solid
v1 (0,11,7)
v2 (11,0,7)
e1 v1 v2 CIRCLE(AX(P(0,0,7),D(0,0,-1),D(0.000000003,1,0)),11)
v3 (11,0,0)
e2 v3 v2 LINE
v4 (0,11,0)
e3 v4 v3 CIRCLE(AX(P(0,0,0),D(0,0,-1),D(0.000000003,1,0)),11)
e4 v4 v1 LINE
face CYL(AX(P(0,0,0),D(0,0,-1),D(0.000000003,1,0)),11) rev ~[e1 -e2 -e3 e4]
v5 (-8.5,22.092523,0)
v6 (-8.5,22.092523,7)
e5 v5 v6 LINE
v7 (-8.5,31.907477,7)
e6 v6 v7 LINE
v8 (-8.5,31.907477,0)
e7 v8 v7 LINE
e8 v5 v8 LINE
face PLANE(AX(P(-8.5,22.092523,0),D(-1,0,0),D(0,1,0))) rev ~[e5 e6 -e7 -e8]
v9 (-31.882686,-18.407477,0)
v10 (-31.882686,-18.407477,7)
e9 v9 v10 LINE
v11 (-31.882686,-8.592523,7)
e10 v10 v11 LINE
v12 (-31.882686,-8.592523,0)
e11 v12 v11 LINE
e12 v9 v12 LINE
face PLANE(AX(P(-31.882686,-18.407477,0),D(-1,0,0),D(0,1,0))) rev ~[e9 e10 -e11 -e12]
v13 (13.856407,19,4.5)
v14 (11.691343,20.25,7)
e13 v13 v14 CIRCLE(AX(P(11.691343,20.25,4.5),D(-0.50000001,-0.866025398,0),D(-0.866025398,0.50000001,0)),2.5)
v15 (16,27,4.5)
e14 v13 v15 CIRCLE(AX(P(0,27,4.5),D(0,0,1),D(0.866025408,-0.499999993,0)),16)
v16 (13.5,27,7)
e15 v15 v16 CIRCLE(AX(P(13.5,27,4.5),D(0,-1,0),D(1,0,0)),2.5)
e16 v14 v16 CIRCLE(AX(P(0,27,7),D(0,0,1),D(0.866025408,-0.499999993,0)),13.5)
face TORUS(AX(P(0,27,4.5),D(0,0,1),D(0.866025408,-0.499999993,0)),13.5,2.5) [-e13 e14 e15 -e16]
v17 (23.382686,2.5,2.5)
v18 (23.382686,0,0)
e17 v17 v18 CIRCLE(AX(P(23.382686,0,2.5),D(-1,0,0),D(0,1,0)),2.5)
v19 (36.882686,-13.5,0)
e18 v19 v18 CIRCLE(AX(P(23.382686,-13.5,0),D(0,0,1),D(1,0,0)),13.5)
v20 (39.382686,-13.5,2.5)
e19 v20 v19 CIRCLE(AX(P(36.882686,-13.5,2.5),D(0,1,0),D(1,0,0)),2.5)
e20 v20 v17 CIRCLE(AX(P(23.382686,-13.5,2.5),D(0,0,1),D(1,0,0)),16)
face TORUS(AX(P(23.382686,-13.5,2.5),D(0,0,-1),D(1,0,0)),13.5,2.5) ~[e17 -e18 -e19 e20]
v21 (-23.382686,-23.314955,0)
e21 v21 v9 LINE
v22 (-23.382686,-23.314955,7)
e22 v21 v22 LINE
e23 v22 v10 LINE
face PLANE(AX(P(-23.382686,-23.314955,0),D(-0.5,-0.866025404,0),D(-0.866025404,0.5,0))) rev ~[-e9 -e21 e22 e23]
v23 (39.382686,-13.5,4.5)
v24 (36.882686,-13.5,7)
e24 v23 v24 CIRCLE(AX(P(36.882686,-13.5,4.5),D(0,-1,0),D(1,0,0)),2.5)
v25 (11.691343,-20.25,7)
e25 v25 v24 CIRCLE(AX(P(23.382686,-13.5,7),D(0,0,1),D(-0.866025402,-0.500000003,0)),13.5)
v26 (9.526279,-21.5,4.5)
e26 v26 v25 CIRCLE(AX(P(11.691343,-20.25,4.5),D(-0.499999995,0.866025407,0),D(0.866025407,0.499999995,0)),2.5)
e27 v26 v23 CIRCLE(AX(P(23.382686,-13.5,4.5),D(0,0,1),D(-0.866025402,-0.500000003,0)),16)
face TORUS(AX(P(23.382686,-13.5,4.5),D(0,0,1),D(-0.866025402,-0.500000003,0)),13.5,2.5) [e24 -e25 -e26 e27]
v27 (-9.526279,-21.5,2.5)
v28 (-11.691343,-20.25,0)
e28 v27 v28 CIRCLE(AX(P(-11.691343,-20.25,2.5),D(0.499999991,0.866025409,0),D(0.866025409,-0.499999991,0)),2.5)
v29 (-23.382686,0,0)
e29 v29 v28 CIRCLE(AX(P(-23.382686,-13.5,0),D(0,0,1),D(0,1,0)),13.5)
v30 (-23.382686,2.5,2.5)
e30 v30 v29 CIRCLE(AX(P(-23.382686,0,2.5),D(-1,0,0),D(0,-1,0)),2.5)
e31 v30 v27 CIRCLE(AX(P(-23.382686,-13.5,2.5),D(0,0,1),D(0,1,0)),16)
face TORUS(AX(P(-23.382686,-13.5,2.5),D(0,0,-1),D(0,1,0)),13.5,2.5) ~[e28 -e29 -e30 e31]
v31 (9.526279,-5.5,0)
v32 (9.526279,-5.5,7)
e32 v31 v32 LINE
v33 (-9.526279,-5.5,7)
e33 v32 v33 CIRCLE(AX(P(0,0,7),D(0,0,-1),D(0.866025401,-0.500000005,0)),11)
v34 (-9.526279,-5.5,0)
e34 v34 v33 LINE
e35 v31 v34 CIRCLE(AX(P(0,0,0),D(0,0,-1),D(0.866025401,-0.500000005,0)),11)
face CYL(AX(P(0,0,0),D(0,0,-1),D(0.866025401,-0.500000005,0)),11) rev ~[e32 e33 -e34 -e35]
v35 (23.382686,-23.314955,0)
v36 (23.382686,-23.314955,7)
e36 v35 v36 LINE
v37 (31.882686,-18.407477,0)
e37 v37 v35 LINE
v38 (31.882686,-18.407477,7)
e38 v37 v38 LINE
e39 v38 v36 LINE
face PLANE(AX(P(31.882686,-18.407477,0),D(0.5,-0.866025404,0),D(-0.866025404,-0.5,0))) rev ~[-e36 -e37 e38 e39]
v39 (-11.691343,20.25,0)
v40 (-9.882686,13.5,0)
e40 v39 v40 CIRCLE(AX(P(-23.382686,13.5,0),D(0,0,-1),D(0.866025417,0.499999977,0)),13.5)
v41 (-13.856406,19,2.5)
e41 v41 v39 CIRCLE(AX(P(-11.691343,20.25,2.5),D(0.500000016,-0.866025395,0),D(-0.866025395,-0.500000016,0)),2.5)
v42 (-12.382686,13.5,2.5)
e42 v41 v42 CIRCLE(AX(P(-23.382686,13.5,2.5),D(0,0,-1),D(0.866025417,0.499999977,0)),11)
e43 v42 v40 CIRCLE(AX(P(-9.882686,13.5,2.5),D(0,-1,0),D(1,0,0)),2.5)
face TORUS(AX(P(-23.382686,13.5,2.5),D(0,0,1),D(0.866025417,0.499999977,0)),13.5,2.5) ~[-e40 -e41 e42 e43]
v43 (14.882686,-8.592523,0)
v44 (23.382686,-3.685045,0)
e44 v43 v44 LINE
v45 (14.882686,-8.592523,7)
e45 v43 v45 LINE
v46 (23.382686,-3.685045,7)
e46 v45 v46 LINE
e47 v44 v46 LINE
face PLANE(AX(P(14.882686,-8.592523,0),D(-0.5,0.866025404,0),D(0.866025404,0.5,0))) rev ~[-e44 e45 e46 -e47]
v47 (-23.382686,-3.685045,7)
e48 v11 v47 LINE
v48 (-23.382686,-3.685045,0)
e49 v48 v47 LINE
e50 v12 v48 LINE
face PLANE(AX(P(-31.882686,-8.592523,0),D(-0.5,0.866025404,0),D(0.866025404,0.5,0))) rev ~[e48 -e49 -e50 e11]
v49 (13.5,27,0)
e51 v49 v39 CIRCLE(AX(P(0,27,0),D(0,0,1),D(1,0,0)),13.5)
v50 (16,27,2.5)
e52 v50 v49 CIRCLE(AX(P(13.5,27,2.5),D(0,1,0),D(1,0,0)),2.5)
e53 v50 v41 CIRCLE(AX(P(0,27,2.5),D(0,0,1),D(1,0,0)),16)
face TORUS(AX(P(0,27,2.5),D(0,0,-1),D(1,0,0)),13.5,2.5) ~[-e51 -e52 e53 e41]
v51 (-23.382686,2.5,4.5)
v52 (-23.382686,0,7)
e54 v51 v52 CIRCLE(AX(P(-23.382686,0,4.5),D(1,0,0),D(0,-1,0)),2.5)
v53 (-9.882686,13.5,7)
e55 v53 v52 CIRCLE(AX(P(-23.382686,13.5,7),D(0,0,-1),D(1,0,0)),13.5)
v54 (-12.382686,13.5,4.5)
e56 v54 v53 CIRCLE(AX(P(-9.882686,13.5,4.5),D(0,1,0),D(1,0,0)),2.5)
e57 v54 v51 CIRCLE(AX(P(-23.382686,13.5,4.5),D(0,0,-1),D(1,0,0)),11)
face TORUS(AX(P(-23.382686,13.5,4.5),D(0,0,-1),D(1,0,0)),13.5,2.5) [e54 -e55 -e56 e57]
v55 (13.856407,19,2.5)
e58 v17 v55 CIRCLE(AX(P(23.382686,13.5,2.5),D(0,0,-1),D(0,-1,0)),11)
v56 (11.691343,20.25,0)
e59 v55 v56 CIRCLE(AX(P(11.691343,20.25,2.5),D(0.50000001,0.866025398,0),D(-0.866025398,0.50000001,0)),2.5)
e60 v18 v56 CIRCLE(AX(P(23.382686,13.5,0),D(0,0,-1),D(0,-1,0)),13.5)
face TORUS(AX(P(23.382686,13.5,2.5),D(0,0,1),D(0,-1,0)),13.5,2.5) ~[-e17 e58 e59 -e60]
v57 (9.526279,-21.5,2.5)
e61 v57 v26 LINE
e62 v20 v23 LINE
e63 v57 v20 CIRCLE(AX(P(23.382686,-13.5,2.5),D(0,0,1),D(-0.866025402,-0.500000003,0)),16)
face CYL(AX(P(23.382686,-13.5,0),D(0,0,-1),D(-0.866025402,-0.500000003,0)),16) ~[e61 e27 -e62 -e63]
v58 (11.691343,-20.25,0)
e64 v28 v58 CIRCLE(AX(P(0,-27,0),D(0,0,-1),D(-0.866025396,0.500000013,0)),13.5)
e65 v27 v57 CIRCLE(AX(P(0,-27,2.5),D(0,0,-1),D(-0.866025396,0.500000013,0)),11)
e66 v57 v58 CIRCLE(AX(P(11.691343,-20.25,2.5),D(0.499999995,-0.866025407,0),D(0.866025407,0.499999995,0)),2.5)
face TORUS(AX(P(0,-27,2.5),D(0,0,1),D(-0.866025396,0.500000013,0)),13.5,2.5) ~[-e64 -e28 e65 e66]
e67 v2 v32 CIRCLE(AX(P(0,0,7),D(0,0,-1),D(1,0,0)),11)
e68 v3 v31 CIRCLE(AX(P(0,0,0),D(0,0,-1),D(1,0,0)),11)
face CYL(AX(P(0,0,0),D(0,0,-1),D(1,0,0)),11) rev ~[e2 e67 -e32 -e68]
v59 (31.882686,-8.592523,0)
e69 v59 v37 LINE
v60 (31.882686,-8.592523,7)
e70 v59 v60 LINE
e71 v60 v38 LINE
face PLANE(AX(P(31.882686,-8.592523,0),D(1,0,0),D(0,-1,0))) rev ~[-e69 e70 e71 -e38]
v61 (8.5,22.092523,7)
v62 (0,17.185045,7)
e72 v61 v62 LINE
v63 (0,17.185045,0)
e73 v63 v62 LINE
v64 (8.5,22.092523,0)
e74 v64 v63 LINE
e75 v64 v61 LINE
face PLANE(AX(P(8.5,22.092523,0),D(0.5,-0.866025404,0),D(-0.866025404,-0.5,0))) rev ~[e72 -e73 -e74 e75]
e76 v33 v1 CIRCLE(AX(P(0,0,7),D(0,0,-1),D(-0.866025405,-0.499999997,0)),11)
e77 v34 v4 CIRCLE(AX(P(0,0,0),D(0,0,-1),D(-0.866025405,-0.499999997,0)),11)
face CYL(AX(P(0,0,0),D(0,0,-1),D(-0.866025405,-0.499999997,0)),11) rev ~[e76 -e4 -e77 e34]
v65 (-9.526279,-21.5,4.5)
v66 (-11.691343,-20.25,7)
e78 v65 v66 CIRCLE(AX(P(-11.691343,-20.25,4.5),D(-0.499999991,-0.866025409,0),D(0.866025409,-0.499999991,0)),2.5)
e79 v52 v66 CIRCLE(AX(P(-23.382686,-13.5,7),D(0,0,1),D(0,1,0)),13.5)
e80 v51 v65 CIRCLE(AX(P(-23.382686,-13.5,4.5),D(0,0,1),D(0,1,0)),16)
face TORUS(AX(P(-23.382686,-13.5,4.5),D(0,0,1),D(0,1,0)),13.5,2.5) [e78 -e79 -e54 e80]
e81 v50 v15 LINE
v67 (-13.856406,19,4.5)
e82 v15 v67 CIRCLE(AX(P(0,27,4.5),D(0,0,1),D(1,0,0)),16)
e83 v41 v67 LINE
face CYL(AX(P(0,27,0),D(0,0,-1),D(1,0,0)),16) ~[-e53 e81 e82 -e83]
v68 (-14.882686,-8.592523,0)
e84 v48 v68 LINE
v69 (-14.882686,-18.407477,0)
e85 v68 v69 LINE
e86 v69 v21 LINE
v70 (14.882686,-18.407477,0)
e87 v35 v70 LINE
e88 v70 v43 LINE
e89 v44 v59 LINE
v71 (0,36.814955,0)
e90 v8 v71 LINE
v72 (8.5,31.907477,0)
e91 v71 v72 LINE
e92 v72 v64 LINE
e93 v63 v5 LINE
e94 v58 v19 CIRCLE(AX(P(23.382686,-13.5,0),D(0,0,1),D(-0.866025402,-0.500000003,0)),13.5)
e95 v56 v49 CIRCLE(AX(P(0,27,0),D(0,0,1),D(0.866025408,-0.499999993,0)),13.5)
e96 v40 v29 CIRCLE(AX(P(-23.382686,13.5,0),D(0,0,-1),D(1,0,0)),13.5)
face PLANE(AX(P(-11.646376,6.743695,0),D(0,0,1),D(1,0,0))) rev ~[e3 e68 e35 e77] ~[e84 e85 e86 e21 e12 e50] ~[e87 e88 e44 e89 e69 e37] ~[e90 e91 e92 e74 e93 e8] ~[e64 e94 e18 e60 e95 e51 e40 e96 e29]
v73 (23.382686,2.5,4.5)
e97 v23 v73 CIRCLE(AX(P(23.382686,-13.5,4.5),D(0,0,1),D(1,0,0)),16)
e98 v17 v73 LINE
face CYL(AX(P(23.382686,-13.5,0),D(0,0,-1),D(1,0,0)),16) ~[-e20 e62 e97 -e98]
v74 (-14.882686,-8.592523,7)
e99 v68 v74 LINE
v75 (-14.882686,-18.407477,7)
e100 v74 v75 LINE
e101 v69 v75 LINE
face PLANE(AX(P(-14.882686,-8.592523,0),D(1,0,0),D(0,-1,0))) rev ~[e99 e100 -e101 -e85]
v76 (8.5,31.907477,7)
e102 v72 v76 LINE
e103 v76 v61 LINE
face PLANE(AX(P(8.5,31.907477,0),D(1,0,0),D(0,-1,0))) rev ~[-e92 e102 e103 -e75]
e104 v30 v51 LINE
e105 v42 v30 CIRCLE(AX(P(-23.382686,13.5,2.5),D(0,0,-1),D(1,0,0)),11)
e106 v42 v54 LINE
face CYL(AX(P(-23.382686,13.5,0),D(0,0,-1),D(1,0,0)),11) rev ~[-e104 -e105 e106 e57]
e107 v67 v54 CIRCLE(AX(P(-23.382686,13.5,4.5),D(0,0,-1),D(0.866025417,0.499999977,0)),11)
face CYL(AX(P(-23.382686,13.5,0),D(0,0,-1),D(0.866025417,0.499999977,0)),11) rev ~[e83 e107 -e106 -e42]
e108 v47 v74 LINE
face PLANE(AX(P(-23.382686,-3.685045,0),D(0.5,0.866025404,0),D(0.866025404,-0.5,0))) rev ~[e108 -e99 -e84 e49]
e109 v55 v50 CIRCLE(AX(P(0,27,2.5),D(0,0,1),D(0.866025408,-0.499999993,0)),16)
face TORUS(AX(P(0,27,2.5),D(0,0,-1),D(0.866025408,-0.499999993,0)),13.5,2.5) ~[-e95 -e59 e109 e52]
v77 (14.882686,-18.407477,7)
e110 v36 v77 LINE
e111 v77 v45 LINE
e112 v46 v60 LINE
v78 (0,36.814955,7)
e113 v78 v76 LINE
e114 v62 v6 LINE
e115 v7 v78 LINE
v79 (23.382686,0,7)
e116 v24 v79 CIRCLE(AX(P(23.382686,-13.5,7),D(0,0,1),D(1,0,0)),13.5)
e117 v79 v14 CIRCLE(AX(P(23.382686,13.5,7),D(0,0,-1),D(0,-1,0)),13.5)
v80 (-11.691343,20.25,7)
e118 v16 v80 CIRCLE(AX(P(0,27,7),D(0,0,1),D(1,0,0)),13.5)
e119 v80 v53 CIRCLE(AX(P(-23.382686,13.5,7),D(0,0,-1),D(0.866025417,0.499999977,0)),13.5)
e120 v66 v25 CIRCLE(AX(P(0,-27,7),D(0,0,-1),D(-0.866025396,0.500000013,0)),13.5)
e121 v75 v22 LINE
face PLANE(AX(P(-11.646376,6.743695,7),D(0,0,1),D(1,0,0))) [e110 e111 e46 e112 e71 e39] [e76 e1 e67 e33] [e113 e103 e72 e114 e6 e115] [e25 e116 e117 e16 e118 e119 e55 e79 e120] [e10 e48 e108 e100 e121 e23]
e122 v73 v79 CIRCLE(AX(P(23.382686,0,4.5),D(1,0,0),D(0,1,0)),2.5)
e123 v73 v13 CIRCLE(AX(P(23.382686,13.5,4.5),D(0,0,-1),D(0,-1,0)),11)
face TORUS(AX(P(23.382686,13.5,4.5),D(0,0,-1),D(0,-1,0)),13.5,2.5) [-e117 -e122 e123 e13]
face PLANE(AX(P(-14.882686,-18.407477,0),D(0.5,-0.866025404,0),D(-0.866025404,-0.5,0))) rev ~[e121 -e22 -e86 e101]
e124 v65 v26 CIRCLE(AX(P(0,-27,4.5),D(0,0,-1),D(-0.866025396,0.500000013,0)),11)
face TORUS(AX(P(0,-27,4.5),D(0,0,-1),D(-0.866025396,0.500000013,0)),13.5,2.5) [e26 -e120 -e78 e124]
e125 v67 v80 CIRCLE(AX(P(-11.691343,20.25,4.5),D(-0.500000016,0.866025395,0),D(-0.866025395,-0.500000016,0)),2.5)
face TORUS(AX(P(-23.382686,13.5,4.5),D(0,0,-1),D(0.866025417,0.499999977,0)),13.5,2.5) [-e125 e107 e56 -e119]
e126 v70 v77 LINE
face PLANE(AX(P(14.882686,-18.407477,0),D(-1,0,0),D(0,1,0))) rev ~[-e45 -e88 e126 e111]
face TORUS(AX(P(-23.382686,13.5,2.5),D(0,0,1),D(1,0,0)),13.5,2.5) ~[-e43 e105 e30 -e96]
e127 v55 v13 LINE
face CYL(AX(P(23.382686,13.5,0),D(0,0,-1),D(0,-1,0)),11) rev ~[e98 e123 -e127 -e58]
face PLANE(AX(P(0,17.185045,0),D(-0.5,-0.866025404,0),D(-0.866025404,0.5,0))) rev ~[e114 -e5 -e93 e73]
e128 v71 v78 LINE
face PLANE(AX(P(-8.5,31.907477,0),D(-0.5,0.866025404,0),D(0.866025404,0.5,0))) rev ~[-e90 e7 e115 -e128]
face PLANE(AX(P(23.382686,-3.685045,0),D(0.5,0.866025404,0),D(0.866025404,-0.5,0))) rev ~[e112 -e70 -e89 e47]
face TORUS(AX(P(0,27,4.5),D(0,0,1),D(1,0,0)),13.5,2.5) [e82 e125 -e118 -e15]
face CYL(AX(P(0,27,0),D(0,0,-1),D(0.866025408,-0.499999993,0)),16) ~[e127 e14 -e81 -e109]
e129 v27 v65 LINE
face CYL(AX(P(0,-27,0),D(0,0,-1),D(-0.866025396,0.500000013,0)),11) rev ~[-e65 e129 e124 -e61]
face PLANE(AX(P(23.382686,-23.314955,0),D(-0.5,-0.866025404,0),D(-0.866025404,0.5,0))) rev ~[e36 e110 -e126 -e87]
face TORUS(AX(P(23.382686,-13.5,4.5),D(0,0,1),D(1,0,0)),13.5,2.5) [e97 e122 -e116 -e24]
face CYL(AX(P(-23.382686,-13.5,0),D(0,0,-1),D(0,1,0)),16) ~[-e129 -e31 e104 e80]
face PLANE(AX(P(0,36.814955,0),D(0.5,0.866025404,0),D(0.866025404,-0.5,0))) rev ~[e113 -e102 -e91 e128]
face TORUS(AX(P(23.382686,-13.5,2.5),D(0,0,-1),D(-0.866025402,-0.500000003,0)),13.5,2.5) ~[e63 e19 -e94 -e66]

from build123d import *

# Parameters (mm, degrees)
F1_DEPTH = 7
F2_R     = 2.5


with BuildPart() as f1:
    # F0 (on Top) → F1 (new body)
    with BuildSketch(Plane.XY):
        with BuildLine():
            ThreePointArc((-9.5262794581, -5.4999999715), (-9.5262794251, 5.5000000286), (3.3e-08, 11))
            ThreePointArc((3.3e-08, 11), (-7.9999998612, 13.1435934593), (-13.8564063169, 18.9999997511))
            ThreePointArc((-13.8564063169, 18.9999997511), (-12.7575017758, 16.3470093573), (-12.3826859022, 13.5))
            ThreePointArc((-12.3826859022, 13.5), (-15.6045113091, 5.7218254069), (-23.3826859022, 2.5))
            ThreePointArc((-23.3826859022, 2.5), (-15.3826859164, 0.3564064688), (-9.5262794581, -5.4999999715))
        make_face()
        with BuildLine():
            ThreePointArc((-13.8564063169, 18.9999997511), (-7.9999998612, 13.1435934593), (3.3e-08, 11))
            ThreePointArc((3.3e-08, 11), (8.0000000671, 13.1435935782), (13.8564065215, 19.0000001056))
            ThreePointArc((13.8564065215, 19.0000001056), (15.4548132364, 22.8588953372), (16, 27))
            ThreePointArc((16, 27), (-4.1411048604, 42.4548131834), (-13.8564063169, 18.9999997511))
        make_face()
        Polygon((0, 36.8149545762), (8.5, 31.9074772881), (8.5, 22.0925227119), (0, 17.1850454238), (-8.5, 22.0925227119), (-8.5, 31.9074772881), align=None, mode=Mode.SUBTRACT)
        with BuildLine():
            ThreePointArc((3.3e-08, 11), (7.7781746047, 7.7781745814), (11, 0))
            ThreePointArc((11, 0), (10.6251840805, -2.8470095287), (9.5262794079, -5.5000000584))
            ThreePointArc((9.5262794079, -5.5000000584), (15.382685873, 0.3564064437), (23.3826859022, 2.5))
            ThreePointArc((23.3826859022, 2.5), (13.8564064301, 8.0000000528), (13.8564065215, 19.0000001056))
            ThreePointArc((13.8564065215, 19.0000001056), (8.0000000671, 13.1435935782), (3.3e-08, 11))
        make_face()
        with BuildLine():
            ThreePointArc((23.3826859022, 2.5), (15.382685873, 0.3564064437), (9.5262794079, -5.5000000584))
            ThreePointArc((9.5262794079, -5.5000000584), (7.3826859022, -13.5000000639), (9.5262794719, -21.5000000524))
            ThreePointArc((9.5262794719, -21.5000000524), (27.523790653, -28.9548132128), (39.3826859022, -13.5))
            ThreePointArc((39.3826859022, -13.5), (34.6963944012, -2.186291501), (23.3826859022, 2.5))
        make_face()
        Polygon((14.8826859022, -8.5925227119), (23.3826859022, -3.6850454238), (31.8826859022, -8.5925227119), (31.8826859022, -18.4074772881), (23.3826859022, -23.3149545762), (14.8826859022, -18.4074772881), align=None, mode=Mode.SUBTRACT)
        with BuildLine():
            ThreePointArc((9.5262794719, -21.5000000524), (7.3826859022, -13.5000000639), (9.5262794079, -5.5000000584))
            ThreePointArc((9.5262794079, -5.5000000584), (-5.02e-08, -11), (-9.5262794581, -5.4999999715))
            ThreePointArc((-9.5262794581, -5.4999999715), (-7.9278726858, -9.3588952624), (-7.3826859022, -13.5))
            ThreePointArc((-7.3826859022, -13.5), (-7.9278726602, -17.641104642), (-9.5262793592, -21.4999998571))
            ThreePointArc((-9.5262793592, -21.4999998571), (1.127e-07, -16), (9.5262794719, -21.5000000524))
        make_face()
        with BuildLine():
            ThreePointArc((-7.3826859022, -13.5), (-7.9278726858, -9.3588952624), (-9.5262794581, -5.4999999715))
            ThreePointArc((-9.5262794581, -5.4999999715), (-15.3826859164, 0.3564064688), (-23.3826859022, 2.5))
            ThreePointArc((-23.3826859022, 2.5), (-37.2390923215, -21.5000000714), (-9.5262793592, -21.4999998571))
            ThreePointArc((-9.5262793592, -21.4999998571), (-7.9278726602, -17.641104642), (-7.3826859022, -13.5))
        make_face()
        Polygon((-23.3826859022, -3.6850454238), (-14.8826859022, -8.5925227119), (-14.8826859022, -18.4074772881), (-23.3826859022, -23.3149545762), (-31.8826859022, -18.4074772881), (-31.8826859022, -8.5925227119), align=None, mode=Mode.SUBTRACT)
    extrude(amount=F1_DEPTH)

    # F2
    f2_edges = [f1.edges().sort_by_distance(p)[0] for p in [
        (0, 43, 7),
        (0, 43, 0),
        (13.856406, 8, 7),
        (13.856406, 8, 0),
        (37.239092, -21.5, 0),
        (37.239092, -21.5, 7),
        (0, -16, 7),
        (0, -16, 0),
        (-37.239092, -21.5, 0),
        (-37.239092, -21.5, 7),
        (-13.856407, 8, 7),
        (-13.856407, 8, 0),
    ]]
    fillet(f2_edges, radius=F2_R)


solid = f1.part
